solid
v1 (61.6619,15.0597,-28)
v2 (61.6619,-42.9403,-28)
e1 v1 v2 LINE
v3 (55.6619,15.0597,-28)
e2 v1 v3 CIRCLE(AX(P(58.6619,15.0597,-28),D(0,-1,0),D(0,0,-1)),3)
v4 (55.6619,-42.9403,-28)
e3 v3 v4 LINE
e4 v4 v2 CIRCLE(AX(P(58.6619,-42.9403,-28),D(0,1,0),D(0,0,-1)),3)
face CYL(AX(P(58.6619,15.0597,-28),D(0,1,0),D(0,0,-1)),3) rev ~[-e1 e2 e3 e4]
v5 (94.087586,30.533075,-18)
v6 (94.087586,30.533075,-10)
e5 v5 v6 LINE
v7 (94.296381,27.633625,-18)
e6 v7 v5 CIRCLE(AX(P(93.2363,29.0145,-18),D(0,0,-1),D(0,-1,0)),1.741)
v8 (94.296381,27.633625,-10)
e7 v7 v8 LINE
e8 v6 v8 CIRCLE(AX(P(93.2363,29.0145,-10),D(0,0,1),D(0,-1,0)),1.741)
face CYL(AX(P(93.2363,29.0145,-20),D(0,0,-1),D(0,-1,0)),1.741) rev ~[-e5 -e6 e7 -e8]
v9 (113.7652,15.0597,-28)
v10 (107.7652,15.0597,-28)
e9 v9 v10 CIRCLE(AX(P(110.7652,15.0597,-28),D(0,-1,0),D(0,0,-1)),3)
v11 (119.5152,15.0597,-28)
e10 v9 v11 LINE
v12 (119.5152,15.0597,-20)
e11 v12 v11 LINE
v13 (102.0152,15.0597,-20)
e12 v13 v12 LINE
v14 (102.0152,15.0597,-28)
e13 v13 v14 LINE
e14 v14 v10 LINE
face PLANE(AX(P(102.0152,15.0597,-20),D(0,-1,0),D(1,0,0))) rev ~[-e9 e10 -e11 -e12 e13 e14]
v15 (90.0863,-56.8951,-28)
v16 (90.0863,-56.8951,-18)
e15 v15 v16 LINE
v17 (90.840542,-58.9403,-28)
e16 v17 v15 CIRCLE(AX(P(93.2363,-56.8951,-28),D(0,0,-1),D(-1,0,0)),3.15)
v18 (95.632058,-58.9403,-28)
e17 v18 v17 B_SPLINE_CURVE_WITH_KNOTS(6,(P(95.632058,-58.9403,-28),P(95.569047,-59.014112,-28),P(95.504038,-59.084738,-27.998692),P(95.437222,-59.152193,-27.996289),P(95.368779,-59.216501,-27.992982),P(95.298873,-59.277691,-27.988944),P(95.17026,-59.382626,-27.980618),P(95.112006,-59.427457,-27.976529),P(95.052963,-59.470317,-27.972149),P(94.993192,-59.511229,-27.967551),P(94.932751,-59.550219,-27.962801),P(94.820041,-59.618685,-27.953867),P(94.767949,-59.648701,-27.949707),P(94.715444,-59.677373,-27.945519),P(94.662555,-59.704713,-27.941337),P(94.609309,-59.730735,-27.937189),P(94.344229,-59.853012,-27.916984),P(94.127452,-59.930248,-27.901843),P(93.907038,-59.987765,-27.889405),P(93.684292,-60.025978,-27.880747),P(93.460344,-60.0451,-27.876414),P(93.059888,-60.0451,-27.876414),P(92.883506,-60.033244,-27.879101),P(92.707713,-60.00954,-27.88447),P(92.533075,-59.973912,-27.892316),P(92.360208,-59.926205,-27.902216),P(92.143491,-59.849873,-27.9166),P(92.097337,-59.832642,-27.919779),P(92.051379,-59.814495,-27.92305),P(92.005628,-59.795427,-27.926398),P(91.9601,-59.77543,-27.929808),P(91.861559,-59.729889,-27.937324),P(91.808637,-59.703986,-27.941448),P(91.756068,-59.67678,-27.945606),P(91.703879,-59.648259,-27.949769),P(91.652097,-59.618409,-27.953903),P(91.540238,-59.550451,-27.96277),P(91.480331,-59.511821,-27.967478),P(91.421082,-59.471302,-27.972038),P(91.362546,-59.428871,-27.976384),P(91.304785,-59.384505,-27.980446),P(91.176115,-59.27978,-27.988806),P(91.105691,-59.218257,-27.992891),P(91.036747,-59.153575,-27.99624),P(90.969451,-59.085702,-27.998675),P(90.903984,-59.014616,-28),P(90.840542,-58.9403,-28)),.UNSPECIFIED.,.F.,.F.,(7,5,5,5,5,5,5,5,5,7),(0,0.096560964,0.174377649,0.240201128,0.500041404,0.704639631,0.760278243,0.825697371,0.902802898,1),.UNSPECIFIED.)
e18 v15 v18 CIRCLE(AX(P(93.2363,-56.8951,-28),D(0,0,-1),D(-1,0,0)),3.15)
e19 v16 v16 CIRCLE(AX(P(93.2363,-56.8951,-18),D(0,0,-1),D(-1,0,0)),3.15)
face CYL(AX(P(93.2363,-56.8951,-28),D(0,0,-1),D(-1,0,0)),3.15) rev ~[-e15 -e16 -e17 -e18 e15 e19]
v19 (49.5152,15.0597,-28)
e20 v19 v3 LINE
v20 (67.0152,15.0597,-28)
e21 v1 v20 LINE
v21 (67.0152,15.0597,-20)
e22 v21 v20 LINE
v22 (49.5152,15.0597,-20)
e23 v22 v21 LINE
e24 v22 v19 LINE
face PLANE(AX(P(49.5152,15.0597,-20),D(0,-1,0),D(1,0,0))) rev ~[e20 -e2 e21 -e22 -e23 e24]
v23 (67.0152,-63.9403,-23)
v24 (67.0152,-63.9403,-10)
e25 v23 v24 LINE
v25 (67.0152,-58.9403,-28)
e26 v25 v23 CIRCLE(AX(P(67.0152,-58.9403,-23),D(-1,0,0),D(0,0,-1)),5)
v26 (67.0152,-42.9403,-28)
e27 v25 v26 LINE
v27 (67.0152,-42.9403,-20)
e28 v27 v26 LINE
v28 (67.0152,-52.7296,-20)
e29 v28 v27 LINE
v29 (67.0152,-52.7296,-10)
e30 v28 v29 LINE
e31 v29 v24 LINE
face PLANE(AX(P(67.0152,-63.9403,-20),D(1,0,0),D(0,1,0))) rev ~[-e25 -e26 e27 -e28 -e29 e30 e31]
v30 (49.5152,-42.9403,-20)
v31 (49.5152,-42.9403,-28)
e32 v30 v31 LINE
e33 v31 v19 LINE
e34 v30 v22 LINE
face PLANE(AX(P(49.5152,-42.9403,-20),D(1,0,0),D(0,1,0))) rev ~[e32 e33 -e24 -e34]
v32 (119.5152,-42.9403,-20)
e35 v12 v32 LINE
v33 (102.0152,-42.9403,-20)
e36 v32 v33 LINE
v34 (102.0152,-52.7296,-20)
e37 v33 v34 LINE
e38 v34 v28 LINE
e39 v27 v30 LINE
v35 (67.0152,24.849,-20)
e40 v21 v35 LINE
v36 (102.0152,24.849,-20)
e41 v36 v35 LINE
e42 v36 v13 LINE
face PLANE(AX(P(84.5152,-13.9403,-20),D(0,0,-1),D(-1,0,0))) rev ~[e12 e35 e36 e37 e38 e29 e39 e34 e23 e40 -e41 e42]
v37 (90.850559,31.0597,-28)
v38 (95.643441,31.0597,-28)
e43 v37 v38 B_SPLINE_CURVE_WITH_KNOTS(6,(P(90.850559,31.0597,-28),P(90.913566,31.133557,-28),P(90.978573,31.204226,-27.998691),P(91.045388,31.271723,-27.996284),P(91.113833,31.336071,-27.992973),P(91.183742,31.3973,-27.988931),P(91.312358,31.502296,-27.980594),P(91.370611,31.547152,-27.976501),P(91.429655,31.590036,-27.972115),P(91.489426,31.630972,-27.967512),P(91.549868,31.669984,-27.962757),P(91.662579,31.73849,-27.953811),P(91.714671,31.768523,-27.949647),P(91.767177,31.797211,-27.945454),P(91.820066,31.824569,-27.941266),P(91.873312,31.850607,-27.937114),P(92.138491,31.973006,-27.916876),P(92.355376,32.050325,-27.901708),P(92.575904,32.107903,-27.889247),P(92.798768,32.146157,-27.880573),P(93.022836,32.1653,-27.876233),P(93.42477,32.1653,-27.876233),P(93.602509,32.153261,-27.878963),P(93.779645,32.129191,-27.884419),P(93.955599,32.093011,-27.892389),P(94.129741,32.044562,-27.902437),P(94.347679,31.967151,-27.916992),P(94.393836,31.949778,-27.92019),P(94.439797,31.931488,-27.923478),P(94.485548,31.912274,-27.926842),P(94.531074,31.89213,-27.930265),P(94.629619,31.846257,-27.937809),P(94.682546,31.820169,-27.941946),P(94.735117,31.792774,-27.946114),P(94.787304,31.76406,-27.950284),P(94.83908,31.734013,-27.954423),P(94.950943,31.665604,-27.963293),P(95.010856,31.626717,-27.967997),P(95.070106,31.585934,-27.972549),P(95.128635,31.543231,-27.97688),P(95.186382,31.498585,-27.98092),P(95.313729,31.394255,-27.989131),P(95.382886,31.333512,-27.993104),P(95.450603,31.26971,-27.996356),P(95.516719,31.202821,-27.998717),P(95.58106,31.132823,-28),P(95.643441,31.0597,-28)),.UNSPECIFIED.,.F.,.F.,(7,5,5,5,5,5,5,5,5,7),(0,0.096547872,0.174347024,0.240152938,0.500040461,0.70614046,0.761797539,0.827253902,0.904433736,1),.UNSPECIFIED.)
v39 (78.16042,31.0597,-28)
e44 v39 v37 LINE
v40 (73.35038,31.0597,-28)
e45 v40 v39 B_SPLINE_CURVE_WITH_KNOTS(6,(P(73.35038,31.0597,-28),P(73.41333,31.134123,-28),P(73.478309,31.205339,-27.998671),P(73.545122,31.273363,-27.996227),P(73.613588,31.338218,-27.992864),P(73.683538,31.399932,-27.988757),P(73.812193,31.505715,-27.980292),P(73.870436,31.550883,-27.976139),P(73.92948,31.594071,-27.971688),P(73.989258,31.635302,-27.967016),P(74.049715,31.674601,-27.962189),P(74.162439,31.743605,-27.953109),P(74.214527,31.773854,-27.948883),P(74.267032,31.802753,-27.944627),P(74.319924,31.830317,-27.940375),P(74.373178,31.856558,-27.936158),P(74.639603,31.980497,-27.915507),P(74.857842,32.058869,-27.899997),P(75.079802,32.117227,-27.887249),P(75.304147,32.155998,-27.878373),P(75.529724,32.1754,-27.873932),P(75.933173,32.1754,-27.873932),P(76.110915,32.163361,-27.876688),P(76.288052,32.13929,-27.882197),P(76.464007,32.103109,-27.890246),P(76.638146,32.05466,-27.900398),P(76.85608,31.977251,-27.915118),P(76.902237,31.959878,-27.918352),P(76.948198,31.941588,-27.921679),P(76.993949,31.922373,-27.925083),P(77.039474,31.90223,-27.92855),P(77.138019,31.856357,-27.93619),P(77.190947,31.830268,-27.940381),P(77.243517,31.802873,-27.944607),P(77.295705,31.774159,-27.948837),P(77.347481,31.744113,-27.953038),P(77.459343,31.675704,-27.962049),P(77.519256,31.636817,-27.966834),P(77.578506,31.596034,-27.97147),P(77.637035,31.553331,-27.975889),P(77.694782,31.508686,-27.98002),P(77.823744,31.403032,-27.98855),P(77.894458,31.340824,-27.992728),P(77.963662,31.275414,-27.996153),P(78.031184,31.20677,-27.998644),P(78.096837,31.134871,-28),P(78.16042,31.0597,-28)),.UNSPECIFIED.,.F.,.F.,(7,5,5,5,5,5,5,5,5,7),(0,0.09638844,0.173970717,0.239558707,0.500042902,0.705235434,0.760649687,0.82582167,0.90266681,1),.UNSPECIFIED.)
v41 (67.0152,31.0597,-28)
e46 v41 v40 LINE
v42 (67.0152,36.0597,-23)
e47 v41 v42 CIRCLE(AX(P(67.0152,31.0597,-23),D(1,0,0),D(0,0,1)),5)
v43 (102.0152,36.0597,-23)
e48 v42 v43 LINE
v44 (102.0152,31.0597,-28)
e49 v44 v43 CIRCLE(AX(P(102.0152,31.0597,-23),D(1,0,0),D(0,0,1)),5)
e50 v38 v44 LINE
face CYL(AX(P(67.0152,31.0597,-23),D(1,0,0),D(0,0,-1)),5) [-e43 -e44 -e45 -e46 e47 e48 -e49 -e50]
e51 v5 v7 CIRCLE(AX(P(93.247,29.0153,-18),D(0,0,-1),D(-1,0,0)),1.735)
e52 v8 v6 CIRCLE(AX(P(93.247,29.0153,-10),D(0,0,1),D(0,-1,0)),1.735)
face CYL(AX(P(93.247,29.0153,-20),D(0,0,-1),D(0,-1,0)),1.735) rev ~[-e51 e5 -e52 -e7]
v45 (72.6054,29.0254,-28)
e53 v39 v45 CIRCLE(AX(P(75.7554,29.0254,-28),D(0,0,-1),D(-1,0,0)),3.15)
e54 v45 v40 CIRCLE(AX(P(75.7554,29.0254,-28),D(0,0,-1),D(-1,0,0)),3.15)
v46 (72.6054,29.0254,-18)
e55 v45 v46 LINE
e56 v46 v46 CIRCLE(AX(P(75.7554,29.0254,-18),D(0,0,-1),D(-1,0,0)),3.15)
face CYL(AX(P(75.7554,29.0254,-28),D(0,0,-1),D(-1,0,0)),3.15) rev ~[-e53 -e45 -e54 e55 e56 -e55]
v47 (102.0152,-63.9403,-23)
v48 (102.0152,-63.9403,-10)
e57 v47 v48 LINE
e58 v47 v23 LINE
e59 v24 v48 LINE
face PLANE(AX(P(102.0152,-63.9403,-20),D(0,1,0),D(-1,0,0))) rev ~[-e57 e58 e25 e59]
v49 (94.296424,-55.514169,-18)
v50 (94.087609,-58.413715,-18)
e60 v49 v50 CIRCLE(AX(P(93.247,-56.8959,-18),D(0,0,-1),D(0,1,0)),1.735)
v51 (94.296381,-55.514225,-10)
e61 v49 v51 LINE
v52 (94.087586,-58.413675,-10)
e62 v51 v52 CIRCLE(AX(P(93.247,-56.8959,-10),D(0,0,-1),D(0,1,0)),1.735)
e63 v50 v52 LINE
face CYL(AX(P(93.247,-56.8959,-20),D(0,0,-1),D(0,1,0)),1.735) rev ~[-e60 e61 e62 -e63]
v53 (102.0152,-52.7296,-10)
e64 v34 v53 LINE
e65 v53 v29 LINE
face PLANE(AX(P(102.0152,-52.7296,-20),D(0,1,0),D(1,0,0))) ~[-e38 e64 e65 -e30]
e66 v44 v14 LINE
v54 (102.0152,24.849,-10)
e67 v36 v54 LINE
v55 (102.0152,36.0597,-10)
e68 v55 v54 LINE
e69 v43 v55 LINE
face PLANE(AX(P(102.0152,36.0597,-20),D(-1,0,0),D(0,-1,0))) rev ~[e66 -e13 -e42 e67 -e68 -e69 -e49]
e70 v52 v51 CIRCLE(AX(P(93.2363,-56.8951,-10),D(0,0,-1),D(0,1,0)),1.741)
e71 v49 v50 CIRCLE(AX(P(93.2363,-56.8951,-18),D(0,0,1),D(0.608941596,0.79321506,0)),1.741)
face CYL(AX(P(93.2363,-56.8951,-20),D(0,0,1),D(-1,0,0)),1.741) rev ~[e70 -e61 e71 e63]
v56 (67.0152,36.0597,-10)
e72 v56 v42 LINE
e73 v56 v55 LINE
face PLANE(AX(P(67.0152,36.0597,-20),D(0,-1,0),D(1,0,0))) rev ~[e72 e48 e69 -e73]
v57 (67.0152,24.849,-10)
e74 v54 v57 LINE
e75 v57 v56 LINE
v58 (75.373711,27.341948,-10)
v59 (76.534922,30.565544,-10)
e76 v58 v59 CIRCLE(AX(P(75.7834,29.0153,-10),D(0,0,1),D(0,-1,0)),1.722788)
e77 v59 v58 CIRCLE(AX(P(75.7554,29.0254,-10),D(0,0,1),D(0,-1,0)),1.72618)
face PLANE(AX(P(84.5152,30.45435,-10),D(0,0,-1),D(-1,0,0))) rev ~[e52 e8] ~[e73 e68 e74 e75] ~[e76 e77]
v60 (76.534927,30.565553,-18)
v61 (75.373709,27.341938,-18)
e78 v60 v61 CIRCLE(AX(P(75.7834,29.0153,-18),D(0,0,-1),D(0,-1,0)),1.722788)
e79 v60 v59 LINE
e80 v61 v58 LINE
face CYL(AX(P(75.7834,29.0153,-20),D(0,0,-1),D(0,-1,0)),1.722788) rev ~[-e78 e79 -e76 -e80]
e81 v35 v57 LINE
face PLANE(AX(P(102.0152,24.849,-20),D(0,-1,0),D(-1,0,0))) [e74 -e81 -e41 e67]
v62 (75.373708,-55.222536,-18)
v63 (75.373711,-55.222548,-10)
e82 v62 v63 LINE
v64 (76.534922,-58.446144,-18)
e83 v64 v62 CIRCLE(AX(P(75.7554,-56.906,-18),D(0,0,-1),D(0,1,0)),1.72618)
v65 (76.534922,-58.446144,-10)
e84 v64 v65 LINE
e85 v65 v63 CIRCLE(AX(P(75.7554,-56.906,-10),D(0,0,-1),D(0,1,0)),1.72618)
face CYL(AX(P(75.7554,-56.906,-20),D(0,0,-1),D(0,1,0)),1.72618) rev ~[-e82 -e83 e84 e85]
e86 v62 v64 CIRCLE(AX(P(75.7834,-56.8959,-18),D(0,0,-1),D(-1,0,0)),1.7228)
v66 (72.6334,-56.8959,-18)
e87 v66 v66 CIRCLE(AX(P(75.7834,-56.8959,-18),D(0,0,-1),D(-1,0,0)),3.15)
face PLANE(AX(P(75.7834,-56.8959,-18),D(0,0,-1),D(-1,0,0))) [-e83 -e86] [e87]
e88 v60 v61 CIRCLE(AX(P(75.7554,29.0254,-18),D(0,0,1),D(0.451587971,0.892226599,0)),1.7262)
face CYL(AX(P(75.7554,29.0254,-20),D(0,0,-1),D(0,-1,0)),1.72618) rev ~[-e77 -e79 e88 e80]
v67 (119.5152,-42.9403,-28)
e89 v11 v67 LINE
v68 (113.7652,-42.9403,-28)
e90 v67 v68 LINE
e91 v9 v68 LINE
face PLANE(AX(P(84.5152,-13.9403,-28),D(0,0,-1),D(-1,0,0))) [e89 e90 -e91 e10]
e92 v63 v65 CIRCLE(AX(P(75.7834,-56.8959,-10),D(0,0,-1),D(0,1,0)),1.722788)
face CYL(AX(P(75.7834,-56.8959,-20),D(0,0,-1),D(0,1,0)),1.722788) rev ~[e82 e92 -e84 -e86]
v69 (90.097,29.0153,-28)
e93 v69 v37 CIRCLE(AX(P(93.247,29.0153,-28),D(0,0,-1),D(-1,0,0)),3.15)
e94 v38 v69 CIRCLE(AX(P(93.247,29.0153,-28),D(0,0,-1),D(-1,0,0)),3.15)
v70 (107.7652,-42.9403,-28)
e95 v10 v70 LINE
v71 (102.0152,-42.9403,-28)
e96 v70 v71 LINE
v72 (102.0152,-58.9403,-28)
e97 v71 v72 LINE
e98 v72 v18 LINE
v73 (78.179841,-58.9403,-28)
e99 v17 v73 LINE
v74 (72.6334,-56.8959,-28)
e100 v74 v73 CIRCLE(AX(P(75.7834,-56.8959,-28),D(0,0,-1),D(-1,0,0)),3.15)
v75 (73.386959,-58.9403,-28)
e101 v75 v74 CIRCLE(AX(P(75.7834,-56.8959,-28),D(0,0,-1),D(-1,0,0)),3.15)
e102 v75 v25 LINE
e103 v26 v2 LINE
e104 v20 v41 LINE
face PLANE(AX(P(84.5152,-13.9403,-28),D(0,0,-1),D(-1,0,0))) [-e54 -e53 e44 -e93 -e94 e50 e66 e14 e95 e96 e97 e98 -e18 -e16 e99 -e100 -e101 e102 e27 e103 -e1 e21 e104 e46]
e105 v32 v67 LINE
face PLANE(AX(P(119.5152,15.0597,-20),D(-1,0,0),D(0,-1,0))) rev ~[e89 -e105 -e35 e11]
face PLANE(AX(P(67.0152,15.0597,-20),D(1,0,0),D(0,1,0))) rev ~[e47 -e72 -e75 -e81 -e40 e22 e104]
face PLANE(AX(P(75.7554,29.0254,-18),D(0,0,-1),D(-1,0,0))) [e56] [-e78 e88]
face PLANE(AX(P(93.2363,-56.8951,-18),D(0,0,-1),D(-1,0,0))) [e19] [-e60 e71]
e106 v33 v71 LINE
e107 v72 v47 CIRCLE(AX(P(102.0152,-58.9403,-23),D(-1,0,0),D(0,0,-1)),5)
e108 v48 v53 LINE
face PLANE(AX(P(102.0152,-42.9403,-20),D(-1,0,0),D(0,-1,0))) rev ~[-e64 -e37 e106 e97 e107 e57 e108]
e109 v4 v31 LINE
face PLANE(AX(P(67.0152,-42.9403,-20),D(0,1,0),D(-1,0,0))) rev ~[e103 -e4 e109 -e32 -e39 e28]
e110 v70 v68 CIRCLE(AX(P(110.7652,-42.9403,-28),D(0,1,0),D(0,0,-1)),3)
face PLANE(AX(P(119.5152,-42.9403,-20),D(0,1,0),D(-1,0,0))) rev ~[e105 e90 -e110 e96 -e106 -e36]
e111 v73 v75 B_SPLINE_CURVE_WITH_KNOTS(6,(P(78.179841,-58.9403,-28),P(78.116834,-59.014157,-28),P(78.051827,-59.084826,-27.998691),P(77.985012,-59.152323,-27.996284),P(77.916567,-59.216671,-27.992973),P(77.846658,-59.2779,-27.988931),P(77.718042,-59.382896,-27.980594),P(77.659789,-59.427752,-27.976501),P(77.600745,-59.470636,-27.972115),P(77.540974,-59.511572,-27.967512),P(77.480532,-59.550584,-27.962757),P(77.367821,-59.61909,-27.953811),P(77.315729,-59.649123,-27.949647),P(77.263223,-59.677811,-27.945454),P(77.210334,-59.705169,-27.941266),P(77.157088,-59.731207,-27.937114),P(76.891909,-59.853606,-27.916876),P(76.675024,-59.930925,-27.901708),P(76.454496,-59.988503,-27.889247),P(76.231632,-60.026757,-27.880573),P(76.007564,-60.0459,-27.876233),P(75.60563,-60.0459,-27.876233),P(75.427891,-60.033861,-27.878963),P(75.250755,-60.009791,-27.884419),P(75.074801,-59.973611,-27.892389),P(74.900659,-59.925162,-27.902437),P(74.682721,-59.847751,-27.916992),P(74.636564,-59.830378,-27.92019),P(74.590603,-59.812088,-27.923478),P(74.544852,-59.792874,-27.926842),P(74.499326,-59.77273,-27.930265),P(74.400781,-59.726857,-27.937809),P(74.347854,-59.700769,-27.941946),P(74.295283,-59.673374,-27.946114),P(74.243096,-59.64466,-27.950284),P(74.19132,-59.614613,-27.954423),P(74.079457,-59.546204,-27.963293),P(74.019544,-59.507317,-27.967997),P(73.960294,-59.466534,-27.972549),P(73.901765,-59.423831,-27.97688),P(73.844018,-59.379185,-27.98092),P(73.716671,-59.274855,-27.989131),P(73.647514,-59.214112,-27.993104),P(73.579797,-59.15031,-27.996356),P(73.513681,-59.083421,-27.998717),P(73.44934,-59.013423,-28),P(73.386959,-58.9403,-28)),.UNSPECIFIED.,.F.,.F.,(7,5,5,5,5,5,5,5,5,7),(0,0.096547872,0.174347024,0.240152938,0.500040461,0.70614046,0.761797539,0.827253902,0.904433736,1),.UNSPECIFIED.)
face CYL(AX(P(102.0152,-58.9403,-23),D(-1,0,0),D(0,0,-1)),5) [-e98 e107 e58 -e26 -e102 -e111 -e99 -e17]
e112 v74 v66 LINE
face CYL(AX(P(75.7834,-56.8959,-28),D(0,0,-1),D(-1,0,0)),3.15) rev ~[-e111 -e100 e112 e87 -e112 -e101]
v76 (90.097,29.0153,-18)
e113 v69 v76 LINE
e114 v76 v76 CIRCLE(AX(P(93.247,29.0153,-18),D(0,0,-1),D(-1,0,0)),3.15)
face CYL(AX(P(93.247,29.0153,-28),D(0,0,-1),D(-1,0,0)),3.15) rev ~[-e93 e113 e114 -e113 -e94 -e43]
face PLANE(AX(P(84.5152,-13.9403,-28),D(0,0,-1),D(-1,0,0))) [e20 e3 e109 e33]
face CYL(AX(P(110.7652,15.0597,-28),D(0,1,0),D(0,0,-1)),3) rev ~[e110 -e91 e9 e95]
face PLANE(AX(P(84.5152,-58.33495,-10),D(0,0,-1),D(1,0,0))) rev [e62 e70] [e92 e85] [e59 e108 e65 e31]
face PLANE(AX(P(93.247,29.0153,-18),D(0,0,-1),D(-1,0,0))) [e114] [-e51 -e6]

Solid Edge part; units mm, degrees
sketch "Sketch1" plane through (0, 0, -20) normal (0, 0, -1) x (-1, 0, 0)
  line L0 (-67.0152, -63.9403) -> (-67.0152, -42.9403)
  line L1 (-67.0152, -42.9403) -> (-49.5152, -42.9403)
  line L2 (-49.5152, -42.9403) -> (-49.5152, 15.0597)
  line L3 (-49.5152, 15.0597) -> (-67.0152, 15.0597)
  line L4 (-67.0152, 15.0597) -> (-67.0152, 36.0597)
  line L5 (-67.0152, 36.0597) -> (-102.0152, 36.0597)
  line L6 (-102.0152, 36.0597) -> (-102.0152, 15.0597)
  line L7 (-102.0152, 15.0597) -> (-119.5152, 15.0597)
  line L8 (-119.5152, 15.0597) -> (-119.5152, -42.9403)
  line L9 (-119.5152, -42.9403) -> (-102.0152, -42.9403)
  line L10 (-102.0152, -42.9403) -> (-102.0152, -63.9403)
  line L11 (-102.0152, -63.9403) -> (-67.0152, -63.9403)
  circle A0 centre (-75.7833, -56.8959) radius 1.7228
  circle A1 centre (-93.2363, -56.8951) radius 1.741
  circle A2 centre (-93.247, 29.0153) radius 1.735
  circle A3 centre (-75.7554, 29.0254) radius 1.7262
extrude "Protrusion1" add sketch "Sketch1" along normal blind 8
sketch "Sketch2" plane through (84.5152, -13.9403, -20) normal (0, 0, 1) x (0, -1, 0)
  arc A0 (-41.5739, 9.7812) -> (-44.4734, 9.5724) centre (-42.9556, 8.7318) ccw
  arc A1 (-44.4734, 9.5724) -> (-41.5739, 9.7812) centre (-42.9548, 8.7211) ccw
  line L0 (-38.7893, 17.5) -> (-38.7893, -17.5)
  line L1 (-38.7893, -17.5) -> (-50, -17.5)
  line L2 (-50, -17.5) -> (-50, 17.5)
  line L3 (-50, 17.5) -> (-38.7893, 17.5)
  arc A2 (-44.5058, -7.9803) -> (-41.2822, -9.1415) centre (-42.9657, -8.7598) ccw
  arc A3 (-41.2822, -9.1415) -> (-44.5058, -7.9803) centre (-42.9556, -8.7318) ccw
extrude "ExtrudedCutout_1" add sketch "Sketch2" along normal blind 10
fillet "Round_1" radius 5 1 edges at (84.5152, 36.0597, -28)
mirror "Mirror1" about plane through (84.5152, -13.9403, -24) normal (0, -1, 0) of "ExtrudedCutout_1"
fillet "Round1" radius 5 1 edges at (84.5152, -63.9403, -28)
sketch "Sketch3" plane through (84.5152, -13.9403, -28) normal (0, 0, -1) x (-1, 0, 0)
  circle A0 centre (-8.7318, 42.9556) radius 3.15
  circle A1 centre (-8.7318, 42.9556) radius 1.735
  circle A2 centre (8.7598, 42.9657) radius 3.15
  circle A3 centre (8.7598, 42.9657) radius 1.7262
  circle A4 centre (-8.7211, -42.9548) radius 3.15
  circle A5 centre (-8.7211, -42.9548) radius 1.741
  circle A6 centre (8.7318, -42.9556) radius 3.15
  circle A7 centre (8.7318, -42.9556) radius 1.7228
extrude "ExtrudedCutout_2" cut sketch "Sketch3" against normal blind 10
sketch "Sketch4" plane through (110.7652, 15.0597, -24) normal (0, 1, 0) x (0, 0, -1)
  arc A0 (4, 49.1033) -> (4, 55.1033) centre (4, 52.1033) cw
  line L0 (4, 55.1033) -> (4, 49.1033)
  arc A1 (4, -3) -> (4, 3) centre (4, 0) cw
  line L1 (4, 3) -> (4, -3)
extrude "ExtrudedCutout_3" cut sketch "Sketch4" against normal blind 119
